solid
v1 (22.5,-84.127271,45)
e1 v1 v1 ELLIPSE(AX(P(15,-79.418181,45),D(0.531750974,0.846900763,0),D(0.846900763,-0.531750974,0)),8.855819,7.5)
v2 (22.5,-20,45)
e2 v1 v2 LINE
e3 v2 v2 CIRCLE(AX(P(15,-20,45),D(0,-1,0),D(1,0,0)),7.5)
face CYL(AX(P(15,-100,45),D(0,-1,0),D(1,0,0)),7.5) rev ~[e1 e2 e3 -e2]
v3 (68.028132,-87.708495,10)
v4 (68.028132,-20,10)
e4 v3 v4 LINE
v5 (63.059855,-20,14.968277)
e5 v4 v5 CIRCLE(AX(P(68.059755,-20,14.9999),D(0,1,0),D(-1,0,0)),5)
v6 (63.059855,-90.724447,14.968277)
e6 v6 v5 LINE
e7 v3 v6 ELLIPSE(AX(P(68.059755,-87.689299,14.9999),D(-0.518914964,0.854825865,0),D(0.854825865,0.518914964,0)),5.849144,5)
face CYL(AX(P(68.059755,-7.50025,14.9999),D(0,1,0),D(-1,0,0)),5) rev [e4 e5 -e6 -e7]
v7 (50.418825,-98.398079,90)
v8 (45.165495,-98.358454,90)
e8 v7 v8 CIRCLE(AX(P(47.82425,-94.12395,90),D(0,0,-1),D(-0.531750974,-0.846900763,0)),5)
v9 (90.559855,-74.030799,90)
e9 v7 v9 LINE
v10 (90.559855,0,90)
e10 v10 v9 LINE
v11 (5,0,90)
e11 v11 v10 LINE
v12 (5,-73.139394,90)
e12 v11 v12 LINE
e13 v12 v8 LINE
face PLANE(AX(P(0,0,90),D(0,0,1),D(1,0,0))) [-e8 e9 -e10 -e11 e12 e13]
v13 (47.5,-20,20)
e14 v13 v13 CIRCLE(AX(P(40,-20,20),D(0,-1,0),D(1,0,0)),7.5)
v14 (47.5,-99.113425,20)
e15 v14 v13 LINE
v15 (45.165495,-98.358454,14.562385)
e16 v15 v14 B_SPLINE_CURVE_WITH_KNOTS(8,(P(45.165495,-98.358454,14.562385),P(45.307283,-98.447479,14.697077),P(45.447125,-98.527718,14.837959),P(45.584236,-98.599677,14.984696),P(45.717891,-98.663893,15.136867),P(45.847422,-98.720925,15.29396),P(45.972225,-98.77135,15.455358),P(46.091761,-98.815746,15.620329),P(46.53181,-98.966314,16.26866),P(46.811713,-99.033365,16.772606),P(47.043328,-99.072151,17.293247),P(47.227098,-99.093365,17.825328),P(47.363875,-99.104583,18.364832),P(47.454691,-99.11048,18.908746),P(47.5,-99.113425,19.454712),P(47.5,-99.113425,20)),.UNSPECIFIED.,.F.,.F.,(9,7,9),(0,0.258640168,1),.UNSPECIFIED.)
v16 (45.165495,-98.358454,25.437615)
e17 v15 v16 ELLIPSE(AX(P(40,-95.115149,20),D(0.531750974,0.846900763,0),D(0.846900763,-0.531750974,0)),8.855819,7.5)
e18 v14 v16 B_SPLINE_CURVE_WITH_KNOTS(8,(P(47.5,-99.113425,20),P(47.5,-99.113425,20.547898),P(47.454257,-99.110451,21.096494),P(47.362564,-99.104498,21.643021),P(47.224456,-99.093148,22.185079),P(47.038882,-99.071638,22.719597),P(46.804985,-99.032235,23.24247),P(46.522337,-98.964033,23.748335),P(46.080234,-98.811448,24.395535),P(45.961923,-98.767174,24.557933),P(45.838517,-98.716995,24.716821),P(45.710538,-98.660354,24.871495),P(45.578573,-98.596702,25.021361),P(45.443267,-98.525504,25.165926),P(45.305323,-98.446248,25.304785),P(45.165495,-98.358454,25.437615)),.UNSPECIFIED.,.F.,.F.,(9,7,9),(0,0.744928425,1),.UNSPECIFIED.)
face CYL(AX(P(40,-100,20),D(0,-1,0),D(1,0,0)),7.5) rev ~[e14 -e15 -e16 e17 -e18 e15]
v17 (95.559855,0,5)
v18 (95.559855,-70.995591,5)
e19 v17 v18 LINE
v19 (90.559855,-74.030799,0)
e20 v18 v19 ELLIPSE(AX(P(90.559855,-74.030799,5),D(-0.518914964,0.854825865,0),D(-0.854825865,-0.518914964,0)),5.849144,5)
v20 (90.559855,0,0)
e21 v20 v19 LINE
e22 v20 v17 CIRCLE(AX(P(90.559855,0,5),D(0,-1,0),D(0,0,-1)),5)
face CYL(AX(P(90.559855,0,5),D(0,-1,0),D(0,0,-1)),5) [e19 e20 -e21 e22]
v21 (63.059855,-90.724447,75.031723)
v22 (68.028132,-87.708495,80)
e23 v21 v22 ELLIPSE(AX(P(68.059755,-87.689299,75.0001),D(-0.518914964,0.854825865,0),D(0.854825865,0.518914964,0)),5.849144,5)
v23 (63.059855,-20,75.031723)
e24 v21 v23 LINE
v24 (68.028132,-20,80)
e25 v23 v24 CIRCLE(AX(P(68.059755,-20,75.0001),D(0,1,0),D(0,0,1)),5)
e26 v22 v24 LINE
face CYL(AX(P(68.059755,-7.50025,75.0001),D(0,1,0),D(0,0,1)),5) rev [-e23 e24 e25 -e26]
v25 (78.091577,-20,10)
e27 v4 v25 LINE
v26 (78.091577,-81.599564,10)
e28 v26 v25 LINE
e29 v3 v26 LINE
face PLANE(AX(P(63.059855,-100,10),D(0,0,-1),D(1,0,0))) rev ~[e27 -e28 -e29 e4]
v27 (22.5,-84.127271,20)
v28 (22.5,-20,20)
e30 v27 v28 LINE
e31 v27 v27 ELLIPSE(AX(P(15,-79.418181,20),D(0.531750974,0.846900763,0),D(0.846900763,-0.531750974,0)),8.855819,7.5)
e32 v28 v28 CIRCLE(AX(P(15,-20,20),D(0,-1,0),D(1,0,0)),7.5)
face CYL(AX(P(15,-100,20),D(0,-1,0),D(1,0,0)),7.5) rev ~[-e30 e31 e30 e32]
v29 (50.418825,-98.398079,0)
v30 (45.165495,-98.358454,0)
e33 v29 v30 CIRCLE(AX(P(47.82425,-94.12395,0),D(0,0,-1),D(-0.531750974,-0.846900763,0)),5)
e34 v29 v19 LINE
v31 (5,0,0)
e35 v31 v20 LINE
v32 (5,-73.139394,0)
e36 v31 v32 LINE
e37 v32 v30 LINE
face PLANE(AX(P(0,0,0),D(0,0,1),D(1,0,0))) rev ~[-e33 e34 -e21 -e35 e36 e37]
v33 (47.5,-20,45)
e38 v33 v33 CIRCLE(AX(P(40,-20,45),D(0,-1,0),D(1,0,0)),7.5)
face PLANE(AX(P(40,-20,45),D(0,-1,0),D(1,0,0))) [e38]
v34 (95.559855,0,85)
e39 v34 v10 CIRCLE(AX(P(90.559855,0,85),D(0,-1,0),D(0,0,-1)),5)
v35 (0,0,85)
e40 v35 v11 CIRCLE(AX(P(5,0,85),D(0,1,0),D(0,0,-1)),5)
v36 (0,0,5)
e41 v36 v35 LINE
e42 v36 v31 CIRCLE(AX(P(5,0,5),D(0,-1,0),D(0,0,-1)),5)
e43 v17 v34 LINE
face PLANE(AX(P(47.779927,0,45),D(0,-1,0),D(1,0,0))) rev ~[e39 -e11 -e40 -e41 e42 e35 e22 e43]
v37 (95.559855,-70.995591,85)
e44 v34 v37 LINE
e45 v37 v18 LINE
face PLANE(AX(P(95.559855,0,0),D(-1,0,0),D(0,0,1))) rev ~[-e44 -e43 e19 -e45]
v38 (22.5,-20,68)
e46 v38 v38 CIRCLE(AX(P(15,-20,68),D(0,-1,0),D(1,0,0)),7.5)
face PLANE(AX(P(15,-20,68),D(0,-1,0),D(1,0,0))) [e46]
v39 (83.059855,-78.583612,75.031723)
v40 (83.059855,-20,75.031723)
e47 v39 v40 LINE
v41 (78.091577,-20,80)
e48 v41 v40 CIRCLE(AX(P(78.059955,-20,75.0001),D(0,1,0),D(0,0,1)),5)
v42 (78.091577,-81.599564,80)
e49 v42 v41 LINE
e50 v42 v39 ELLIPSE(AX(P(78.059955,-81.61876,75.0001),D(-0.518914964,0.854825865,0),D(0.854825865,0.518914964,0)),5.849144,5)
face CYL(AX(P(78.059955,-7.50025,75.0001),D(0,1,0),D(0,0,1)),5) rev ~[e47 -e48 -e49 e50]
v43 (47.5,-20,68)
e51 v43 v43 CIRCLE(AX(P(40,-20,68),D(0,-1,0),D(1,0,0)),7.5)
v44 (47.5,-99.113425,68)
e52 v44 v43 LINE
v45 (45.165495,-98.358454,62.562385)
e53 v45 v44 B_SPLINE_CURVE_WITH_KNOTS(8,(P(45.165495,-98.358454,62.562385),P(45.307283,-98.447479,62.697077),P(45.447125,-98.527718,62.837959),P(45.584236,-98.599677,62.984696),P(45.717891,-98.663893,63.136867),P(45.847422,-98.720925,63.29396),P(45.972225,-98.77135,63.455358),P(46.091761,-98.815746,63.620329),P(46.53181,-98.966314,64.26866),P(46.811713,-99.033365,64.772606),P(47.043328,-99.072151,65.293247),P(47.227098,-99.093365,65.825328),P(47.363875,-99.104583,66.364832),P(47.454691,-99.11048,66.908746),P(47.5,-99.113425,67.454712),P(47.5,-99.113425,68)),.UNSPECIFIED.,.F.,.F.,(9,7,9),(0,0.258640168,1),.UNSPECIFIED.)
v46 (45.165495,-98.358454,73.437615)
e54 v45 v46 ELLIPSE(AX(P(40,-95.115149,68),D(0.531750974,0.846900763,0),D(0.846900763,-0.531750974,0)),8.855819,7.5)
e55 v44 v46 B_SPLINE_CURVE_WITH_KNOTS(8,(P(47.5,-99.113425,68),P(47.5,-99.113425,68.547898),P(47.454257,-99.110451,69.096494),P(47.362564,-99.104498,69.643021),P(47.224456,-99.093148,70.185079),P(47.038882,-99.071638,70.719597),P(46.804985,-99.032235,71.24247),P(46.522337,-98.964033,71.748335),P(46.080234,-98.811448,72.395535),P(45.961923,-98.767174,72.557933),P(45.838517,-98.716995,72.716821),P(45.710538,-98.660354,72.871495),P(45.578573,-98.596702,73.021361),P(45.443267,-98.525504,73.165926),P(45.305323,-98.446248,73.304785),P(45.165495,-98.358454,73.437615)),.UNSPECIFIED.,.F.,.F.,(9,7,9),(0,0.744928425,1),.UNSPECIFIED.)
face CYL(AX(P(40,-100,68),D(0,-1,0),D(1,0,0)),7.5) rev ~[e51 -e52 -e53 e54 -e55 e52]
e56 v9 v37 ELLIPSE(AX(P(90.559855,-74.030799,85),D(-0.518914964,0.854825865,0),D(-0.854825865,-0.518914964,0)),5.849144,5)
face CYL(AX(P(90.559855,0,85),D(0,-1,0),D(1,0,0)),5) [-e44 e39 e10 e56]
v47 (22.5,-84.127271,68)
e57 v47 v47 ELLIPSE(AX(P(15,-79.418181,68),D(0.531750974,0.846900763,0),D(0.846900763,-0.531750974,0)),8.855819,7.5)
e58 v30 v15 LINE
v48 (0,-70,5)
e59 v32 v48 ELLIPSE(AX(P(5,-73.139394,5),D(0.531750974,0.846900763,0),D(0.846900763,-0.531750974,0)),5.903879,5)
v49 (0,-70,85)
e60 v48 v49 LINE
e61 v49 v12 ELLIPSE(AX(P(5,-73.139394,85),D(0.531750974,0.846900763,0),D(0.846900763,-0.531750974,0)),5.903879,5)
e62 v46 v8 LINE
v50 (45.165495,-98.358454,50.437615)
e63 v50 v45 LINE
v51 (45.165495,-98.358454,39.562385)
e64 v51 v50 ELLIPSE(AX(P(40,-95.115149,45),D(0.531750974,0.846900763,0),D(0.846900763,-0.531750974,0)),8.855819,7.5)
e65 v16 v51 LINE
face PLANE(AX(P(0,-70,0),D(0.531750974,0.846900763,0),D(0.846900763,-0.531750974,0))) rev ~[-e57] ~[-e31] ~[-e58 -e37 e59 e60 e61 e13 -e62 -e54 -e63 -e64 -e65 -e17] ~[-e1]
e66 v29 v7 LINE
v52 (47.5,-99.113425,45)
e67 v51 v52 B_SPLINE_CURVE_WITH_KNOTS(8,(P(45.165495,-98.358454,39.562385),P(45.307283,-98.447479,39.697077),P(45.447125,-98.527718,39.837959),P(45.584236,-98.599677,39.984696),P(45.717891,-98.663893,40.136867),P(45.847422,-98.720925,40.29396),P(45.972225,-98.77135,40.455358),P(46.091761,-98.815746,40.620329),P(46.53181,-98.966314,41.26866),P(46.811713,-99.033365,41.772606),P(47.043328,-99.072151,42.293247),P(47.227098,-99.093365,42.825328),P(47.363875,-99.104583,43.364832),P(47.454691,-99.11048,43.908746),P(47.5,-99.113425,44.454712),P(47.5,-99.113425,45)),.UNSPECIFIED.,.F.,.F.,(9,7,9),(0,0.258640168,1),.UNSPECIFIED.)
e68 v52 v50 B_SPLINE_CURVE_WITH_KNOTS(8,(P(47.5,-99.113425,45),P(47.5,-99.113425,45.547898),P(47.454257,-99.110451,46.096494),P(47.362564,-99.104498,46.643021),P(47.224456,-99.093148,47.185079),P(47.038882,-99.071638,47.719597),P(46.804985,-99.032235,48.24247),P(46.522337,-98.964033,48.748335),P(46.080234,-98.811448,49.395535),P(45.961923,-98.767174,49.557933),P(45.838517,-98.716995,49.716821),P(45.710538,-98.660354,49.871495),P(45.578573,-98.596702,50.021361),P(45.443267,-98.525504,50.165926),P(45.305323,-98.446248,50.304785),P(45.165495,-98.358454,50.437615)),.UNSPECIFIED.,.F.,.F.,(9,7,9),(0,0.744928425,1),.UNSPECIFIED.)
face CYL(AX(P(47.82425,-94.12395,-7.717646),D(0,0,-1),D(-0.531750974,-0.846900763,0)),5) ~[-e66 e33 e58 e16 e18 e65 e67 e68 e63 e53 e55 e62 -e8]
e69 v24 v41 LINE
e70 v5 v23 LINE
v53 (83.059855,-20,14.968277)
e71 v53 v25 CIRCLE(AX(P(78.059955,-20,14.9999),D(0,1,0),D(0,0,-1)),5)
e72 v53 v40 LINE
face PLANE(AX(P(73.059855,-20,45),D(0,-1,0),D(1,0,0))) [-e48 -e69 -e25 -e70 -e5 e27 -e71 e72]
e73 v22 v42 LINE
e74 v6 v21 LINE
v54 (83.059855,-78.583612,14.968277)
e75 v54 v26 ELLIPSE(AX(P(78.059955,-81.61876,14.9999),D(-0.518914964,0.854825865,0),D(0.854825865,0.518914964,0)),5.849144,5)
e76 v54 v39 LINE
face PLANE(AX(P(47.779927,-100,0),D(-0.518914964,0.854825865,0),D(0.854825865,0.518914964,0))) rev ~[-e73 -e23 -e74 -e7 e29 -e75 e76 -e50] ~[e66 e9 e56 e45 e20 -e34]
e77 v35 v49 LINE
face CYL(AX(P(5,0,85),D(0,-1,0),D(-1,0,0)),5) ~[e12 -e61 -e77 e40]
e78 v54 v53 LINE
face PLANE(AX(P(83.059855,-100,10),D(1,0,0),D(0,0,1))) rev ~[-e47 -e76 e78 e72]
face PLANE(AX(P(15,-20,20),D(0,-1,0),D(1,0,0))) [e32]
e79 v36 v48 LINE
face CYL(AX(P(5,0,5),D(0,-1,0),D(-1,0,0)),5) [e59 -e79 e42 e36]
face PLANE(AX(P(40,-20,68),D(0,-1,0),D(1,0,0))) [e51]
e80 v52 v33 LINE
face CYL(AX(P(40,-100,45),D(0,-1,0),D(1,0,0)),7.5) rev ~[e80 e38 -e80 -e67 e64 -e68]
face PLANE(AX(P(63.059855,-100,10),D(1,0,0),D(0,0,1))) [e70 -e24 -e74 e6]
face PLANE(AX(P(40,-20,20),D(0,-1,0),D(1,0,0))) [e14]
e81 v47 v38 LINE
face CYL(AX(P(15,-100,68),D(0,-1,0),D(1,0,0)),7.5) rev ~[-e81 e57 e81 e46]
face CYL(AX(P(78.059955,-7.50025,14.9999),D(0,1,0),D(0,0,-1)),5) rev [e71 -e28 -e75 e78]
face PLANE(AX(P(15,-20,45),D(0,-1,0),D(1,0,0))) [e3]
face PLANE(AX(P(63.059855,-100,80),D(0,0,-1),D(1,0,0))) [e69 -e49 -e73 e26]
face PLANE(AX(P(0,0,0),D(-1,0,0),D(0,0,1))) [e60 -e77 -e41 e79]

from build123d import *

# Parameters (mm, degrees)
F0_W        = 95.5598546359
F0_H        = 90
F1_DEPTH    = 100
F2_R        = 5
F3_W        = 20
F3_H        = 70
F3_R        = 7.5
F4_DEPTH    = 80
F5_T1_DEPTH = 92.4997500025
F7_DEPTH    = 90
F8_T1_DEPTH = 105.435292613


# Not quite as in the source:
# - a fillet or chamfer that OpenCascade refuses, or shapes differently, is made with other operations: its cross-section is extruded or revolved along the edge and cut away or added


with BuildPart() as f1:
    # F0 (on Front) → F1 (new body)
    with BuildSketch(Plane.XZ):
        with Locations((47.7799273179, 45)):
            Rectangle(F0_W, F0_H)
    extrude(amount=F1_DEPTH)

    # F2
    f2_edges = [f1.edges().sort_by_distance(p)[0] for p in [
        (95.559855, -50, 90),
        (95.559855, -50, 0),
        (0, -50, 0),
        (0, -50, 90),
    ]]
    fillet(f2_edges, radius=F2_R)

    # F3 (on face) → F4 (cut)
    with BuildSketch(Plane.XZ.offset(100)):
        with Locations((73.0598546359, 45)):
            Rectangle(F3_W, F3_H)
        with Locations((15, 45)):
            Circle(F3_R)
        with Locations((15, 68)):
            Circle(F3_R)
        with Locations((40, 45)):
            Circle(F3_R)
        with Locations((40, 68)):
            Circle(F3_R)
        with Locations((15, 20)):
            Circle(F3_R)
        with Locations((40, 20)):
            Circle(F3_R)
    extrude(amount=-F4_DEPTH, mode=Mode.SUBTRACT)

    # F5: fillet of radius 5 on 4 edges, made by hand

    # F5_s2 → F5_t1 (join)
    with BuildSketch(Plane.XZ.offset(7.5002499975)):
        with BuildLine():
            ThreePointArc((68.0597546359, 80.0001), (64.5242207299, 78.5356339059), (63.0597546359, 75.0001))
            Line((63.0597546359, 75.0001), (62.9597546359, 75.0001))
            ThreePointArc((62.9597546359, 75.0001), (62.9598546359, 77.50005), (62.9598546359, 80))
            Line((62.9598546359, 80), (63.0598546359, 80.1))
            ThreePointArc((63.0598546359, 80.1), (65.5598046359, 80.1), (68.0597546359, 80.1001))
            Line((68.0597546359, 80.1001), (68.0597546359, 80.0001))
        make_face()
        with BuildLine():
            ThreePointArc((78.0599546359, 80.0001), (81.5954885418, 78.5356339059), (83.0599546359, 75.0001))
            Line((83.0599546359, 75.0001), (83.1599546359, 75.0001))
            ThreePointArc((83.1599546359, 75.0001), (83.1598546359, 77.50005), (83.1598546359, 80))
            Line((83.1598546359, 80), (83.0598546359, 80.1))
            ThreePointArc((83.0598546359, 80.1), (80.5599046359, 80.1), (78.0599546359, 80.1001))
            Line((78.0599546359, 80.1001), (78.0599546359, 80.0001))
        make_face()
        with BuildLine():
            ThreePointArc((78.0599546359, 9.9999), (81.5954885418, 11.4643660941), (83.0599546359, 14.9999))
            Line((83.0599546359, 14.9999), (83.1599546359, 14.9999))
            ThreePointArc((83.1599546359, 14.9999), (83.1598546359, 12.49995), (83.1598546359, 10))
            Line((83.1598546359, 10), (83.0598546359, 9.9))
            ThreePointArc((83.0598546359, 9.9), (80.5599046359, 9.9), (78.0599546359, 9.8999))
            Line((78.0599546359, 9.8999), (78.0599546359, 9.9999))
        make_face()
        with BuildLine():
            ThreePointArc((63.0597546359, 14.9999), (64.5242207299, 11.4643660941), (68.0597546359, 9.9999))
            Line((68.0597546359, 9.9999), (68.0597546359, 9.8999))
            ThreePointArc((68.0597546359, 9.8999), (65.5598046359, 9.9), (63.0598546359, 9.9))
            Line((63.0598546359, 9.9), (62.9598546359, 10))
            ThreePointArc((62.9598546359, 10), (62.9598546359, 12.49995), (62.9597546359, 14.9999))
            Line((62.9597546359, 14.9999), (63.0597546359, 14.9999))
        make_face()
    extrude(amount=F5_T1_DEPTH)

    # F6 (on face) → F7 (cut)
    with BuildSketch(Plane(origin=(0, 0, 0), x_dir=(1, 0, 0), z_dir=(0, 0, -1))):
        Polygon((0, 124.7042194009), (0, 70), (47.7799273179, 100), (97.1999242902, 70), (97.1999242902, 124.7042194009), align=None)
    extrude(amount=-F7_DEPTH, mode=Mode.SUBTRACT)

    # F8: fillet of radius 5 on 1 edges, made by hand

    # F8_s2 → F8_t1 (cut)
    with BuildSketch(Plane.XY.offset(-7.7176463065)):
        with BuildLine():
            ThreePointArc((45.1654951007, -98.3584536244), (47.7865363785, -99.1238075774), (50.4188247907, -98.3980791373))
            Line((50.4188247907, -98.3980791373), (47.7799273179, -100))
            Line((47.7799273179, -100), (45.1654951007, -98.3584536244))
        make_face()
    extrude(amount=F8_T1_DEPTH, mode=Mode.SUBTRACT)


solid = f1.part
